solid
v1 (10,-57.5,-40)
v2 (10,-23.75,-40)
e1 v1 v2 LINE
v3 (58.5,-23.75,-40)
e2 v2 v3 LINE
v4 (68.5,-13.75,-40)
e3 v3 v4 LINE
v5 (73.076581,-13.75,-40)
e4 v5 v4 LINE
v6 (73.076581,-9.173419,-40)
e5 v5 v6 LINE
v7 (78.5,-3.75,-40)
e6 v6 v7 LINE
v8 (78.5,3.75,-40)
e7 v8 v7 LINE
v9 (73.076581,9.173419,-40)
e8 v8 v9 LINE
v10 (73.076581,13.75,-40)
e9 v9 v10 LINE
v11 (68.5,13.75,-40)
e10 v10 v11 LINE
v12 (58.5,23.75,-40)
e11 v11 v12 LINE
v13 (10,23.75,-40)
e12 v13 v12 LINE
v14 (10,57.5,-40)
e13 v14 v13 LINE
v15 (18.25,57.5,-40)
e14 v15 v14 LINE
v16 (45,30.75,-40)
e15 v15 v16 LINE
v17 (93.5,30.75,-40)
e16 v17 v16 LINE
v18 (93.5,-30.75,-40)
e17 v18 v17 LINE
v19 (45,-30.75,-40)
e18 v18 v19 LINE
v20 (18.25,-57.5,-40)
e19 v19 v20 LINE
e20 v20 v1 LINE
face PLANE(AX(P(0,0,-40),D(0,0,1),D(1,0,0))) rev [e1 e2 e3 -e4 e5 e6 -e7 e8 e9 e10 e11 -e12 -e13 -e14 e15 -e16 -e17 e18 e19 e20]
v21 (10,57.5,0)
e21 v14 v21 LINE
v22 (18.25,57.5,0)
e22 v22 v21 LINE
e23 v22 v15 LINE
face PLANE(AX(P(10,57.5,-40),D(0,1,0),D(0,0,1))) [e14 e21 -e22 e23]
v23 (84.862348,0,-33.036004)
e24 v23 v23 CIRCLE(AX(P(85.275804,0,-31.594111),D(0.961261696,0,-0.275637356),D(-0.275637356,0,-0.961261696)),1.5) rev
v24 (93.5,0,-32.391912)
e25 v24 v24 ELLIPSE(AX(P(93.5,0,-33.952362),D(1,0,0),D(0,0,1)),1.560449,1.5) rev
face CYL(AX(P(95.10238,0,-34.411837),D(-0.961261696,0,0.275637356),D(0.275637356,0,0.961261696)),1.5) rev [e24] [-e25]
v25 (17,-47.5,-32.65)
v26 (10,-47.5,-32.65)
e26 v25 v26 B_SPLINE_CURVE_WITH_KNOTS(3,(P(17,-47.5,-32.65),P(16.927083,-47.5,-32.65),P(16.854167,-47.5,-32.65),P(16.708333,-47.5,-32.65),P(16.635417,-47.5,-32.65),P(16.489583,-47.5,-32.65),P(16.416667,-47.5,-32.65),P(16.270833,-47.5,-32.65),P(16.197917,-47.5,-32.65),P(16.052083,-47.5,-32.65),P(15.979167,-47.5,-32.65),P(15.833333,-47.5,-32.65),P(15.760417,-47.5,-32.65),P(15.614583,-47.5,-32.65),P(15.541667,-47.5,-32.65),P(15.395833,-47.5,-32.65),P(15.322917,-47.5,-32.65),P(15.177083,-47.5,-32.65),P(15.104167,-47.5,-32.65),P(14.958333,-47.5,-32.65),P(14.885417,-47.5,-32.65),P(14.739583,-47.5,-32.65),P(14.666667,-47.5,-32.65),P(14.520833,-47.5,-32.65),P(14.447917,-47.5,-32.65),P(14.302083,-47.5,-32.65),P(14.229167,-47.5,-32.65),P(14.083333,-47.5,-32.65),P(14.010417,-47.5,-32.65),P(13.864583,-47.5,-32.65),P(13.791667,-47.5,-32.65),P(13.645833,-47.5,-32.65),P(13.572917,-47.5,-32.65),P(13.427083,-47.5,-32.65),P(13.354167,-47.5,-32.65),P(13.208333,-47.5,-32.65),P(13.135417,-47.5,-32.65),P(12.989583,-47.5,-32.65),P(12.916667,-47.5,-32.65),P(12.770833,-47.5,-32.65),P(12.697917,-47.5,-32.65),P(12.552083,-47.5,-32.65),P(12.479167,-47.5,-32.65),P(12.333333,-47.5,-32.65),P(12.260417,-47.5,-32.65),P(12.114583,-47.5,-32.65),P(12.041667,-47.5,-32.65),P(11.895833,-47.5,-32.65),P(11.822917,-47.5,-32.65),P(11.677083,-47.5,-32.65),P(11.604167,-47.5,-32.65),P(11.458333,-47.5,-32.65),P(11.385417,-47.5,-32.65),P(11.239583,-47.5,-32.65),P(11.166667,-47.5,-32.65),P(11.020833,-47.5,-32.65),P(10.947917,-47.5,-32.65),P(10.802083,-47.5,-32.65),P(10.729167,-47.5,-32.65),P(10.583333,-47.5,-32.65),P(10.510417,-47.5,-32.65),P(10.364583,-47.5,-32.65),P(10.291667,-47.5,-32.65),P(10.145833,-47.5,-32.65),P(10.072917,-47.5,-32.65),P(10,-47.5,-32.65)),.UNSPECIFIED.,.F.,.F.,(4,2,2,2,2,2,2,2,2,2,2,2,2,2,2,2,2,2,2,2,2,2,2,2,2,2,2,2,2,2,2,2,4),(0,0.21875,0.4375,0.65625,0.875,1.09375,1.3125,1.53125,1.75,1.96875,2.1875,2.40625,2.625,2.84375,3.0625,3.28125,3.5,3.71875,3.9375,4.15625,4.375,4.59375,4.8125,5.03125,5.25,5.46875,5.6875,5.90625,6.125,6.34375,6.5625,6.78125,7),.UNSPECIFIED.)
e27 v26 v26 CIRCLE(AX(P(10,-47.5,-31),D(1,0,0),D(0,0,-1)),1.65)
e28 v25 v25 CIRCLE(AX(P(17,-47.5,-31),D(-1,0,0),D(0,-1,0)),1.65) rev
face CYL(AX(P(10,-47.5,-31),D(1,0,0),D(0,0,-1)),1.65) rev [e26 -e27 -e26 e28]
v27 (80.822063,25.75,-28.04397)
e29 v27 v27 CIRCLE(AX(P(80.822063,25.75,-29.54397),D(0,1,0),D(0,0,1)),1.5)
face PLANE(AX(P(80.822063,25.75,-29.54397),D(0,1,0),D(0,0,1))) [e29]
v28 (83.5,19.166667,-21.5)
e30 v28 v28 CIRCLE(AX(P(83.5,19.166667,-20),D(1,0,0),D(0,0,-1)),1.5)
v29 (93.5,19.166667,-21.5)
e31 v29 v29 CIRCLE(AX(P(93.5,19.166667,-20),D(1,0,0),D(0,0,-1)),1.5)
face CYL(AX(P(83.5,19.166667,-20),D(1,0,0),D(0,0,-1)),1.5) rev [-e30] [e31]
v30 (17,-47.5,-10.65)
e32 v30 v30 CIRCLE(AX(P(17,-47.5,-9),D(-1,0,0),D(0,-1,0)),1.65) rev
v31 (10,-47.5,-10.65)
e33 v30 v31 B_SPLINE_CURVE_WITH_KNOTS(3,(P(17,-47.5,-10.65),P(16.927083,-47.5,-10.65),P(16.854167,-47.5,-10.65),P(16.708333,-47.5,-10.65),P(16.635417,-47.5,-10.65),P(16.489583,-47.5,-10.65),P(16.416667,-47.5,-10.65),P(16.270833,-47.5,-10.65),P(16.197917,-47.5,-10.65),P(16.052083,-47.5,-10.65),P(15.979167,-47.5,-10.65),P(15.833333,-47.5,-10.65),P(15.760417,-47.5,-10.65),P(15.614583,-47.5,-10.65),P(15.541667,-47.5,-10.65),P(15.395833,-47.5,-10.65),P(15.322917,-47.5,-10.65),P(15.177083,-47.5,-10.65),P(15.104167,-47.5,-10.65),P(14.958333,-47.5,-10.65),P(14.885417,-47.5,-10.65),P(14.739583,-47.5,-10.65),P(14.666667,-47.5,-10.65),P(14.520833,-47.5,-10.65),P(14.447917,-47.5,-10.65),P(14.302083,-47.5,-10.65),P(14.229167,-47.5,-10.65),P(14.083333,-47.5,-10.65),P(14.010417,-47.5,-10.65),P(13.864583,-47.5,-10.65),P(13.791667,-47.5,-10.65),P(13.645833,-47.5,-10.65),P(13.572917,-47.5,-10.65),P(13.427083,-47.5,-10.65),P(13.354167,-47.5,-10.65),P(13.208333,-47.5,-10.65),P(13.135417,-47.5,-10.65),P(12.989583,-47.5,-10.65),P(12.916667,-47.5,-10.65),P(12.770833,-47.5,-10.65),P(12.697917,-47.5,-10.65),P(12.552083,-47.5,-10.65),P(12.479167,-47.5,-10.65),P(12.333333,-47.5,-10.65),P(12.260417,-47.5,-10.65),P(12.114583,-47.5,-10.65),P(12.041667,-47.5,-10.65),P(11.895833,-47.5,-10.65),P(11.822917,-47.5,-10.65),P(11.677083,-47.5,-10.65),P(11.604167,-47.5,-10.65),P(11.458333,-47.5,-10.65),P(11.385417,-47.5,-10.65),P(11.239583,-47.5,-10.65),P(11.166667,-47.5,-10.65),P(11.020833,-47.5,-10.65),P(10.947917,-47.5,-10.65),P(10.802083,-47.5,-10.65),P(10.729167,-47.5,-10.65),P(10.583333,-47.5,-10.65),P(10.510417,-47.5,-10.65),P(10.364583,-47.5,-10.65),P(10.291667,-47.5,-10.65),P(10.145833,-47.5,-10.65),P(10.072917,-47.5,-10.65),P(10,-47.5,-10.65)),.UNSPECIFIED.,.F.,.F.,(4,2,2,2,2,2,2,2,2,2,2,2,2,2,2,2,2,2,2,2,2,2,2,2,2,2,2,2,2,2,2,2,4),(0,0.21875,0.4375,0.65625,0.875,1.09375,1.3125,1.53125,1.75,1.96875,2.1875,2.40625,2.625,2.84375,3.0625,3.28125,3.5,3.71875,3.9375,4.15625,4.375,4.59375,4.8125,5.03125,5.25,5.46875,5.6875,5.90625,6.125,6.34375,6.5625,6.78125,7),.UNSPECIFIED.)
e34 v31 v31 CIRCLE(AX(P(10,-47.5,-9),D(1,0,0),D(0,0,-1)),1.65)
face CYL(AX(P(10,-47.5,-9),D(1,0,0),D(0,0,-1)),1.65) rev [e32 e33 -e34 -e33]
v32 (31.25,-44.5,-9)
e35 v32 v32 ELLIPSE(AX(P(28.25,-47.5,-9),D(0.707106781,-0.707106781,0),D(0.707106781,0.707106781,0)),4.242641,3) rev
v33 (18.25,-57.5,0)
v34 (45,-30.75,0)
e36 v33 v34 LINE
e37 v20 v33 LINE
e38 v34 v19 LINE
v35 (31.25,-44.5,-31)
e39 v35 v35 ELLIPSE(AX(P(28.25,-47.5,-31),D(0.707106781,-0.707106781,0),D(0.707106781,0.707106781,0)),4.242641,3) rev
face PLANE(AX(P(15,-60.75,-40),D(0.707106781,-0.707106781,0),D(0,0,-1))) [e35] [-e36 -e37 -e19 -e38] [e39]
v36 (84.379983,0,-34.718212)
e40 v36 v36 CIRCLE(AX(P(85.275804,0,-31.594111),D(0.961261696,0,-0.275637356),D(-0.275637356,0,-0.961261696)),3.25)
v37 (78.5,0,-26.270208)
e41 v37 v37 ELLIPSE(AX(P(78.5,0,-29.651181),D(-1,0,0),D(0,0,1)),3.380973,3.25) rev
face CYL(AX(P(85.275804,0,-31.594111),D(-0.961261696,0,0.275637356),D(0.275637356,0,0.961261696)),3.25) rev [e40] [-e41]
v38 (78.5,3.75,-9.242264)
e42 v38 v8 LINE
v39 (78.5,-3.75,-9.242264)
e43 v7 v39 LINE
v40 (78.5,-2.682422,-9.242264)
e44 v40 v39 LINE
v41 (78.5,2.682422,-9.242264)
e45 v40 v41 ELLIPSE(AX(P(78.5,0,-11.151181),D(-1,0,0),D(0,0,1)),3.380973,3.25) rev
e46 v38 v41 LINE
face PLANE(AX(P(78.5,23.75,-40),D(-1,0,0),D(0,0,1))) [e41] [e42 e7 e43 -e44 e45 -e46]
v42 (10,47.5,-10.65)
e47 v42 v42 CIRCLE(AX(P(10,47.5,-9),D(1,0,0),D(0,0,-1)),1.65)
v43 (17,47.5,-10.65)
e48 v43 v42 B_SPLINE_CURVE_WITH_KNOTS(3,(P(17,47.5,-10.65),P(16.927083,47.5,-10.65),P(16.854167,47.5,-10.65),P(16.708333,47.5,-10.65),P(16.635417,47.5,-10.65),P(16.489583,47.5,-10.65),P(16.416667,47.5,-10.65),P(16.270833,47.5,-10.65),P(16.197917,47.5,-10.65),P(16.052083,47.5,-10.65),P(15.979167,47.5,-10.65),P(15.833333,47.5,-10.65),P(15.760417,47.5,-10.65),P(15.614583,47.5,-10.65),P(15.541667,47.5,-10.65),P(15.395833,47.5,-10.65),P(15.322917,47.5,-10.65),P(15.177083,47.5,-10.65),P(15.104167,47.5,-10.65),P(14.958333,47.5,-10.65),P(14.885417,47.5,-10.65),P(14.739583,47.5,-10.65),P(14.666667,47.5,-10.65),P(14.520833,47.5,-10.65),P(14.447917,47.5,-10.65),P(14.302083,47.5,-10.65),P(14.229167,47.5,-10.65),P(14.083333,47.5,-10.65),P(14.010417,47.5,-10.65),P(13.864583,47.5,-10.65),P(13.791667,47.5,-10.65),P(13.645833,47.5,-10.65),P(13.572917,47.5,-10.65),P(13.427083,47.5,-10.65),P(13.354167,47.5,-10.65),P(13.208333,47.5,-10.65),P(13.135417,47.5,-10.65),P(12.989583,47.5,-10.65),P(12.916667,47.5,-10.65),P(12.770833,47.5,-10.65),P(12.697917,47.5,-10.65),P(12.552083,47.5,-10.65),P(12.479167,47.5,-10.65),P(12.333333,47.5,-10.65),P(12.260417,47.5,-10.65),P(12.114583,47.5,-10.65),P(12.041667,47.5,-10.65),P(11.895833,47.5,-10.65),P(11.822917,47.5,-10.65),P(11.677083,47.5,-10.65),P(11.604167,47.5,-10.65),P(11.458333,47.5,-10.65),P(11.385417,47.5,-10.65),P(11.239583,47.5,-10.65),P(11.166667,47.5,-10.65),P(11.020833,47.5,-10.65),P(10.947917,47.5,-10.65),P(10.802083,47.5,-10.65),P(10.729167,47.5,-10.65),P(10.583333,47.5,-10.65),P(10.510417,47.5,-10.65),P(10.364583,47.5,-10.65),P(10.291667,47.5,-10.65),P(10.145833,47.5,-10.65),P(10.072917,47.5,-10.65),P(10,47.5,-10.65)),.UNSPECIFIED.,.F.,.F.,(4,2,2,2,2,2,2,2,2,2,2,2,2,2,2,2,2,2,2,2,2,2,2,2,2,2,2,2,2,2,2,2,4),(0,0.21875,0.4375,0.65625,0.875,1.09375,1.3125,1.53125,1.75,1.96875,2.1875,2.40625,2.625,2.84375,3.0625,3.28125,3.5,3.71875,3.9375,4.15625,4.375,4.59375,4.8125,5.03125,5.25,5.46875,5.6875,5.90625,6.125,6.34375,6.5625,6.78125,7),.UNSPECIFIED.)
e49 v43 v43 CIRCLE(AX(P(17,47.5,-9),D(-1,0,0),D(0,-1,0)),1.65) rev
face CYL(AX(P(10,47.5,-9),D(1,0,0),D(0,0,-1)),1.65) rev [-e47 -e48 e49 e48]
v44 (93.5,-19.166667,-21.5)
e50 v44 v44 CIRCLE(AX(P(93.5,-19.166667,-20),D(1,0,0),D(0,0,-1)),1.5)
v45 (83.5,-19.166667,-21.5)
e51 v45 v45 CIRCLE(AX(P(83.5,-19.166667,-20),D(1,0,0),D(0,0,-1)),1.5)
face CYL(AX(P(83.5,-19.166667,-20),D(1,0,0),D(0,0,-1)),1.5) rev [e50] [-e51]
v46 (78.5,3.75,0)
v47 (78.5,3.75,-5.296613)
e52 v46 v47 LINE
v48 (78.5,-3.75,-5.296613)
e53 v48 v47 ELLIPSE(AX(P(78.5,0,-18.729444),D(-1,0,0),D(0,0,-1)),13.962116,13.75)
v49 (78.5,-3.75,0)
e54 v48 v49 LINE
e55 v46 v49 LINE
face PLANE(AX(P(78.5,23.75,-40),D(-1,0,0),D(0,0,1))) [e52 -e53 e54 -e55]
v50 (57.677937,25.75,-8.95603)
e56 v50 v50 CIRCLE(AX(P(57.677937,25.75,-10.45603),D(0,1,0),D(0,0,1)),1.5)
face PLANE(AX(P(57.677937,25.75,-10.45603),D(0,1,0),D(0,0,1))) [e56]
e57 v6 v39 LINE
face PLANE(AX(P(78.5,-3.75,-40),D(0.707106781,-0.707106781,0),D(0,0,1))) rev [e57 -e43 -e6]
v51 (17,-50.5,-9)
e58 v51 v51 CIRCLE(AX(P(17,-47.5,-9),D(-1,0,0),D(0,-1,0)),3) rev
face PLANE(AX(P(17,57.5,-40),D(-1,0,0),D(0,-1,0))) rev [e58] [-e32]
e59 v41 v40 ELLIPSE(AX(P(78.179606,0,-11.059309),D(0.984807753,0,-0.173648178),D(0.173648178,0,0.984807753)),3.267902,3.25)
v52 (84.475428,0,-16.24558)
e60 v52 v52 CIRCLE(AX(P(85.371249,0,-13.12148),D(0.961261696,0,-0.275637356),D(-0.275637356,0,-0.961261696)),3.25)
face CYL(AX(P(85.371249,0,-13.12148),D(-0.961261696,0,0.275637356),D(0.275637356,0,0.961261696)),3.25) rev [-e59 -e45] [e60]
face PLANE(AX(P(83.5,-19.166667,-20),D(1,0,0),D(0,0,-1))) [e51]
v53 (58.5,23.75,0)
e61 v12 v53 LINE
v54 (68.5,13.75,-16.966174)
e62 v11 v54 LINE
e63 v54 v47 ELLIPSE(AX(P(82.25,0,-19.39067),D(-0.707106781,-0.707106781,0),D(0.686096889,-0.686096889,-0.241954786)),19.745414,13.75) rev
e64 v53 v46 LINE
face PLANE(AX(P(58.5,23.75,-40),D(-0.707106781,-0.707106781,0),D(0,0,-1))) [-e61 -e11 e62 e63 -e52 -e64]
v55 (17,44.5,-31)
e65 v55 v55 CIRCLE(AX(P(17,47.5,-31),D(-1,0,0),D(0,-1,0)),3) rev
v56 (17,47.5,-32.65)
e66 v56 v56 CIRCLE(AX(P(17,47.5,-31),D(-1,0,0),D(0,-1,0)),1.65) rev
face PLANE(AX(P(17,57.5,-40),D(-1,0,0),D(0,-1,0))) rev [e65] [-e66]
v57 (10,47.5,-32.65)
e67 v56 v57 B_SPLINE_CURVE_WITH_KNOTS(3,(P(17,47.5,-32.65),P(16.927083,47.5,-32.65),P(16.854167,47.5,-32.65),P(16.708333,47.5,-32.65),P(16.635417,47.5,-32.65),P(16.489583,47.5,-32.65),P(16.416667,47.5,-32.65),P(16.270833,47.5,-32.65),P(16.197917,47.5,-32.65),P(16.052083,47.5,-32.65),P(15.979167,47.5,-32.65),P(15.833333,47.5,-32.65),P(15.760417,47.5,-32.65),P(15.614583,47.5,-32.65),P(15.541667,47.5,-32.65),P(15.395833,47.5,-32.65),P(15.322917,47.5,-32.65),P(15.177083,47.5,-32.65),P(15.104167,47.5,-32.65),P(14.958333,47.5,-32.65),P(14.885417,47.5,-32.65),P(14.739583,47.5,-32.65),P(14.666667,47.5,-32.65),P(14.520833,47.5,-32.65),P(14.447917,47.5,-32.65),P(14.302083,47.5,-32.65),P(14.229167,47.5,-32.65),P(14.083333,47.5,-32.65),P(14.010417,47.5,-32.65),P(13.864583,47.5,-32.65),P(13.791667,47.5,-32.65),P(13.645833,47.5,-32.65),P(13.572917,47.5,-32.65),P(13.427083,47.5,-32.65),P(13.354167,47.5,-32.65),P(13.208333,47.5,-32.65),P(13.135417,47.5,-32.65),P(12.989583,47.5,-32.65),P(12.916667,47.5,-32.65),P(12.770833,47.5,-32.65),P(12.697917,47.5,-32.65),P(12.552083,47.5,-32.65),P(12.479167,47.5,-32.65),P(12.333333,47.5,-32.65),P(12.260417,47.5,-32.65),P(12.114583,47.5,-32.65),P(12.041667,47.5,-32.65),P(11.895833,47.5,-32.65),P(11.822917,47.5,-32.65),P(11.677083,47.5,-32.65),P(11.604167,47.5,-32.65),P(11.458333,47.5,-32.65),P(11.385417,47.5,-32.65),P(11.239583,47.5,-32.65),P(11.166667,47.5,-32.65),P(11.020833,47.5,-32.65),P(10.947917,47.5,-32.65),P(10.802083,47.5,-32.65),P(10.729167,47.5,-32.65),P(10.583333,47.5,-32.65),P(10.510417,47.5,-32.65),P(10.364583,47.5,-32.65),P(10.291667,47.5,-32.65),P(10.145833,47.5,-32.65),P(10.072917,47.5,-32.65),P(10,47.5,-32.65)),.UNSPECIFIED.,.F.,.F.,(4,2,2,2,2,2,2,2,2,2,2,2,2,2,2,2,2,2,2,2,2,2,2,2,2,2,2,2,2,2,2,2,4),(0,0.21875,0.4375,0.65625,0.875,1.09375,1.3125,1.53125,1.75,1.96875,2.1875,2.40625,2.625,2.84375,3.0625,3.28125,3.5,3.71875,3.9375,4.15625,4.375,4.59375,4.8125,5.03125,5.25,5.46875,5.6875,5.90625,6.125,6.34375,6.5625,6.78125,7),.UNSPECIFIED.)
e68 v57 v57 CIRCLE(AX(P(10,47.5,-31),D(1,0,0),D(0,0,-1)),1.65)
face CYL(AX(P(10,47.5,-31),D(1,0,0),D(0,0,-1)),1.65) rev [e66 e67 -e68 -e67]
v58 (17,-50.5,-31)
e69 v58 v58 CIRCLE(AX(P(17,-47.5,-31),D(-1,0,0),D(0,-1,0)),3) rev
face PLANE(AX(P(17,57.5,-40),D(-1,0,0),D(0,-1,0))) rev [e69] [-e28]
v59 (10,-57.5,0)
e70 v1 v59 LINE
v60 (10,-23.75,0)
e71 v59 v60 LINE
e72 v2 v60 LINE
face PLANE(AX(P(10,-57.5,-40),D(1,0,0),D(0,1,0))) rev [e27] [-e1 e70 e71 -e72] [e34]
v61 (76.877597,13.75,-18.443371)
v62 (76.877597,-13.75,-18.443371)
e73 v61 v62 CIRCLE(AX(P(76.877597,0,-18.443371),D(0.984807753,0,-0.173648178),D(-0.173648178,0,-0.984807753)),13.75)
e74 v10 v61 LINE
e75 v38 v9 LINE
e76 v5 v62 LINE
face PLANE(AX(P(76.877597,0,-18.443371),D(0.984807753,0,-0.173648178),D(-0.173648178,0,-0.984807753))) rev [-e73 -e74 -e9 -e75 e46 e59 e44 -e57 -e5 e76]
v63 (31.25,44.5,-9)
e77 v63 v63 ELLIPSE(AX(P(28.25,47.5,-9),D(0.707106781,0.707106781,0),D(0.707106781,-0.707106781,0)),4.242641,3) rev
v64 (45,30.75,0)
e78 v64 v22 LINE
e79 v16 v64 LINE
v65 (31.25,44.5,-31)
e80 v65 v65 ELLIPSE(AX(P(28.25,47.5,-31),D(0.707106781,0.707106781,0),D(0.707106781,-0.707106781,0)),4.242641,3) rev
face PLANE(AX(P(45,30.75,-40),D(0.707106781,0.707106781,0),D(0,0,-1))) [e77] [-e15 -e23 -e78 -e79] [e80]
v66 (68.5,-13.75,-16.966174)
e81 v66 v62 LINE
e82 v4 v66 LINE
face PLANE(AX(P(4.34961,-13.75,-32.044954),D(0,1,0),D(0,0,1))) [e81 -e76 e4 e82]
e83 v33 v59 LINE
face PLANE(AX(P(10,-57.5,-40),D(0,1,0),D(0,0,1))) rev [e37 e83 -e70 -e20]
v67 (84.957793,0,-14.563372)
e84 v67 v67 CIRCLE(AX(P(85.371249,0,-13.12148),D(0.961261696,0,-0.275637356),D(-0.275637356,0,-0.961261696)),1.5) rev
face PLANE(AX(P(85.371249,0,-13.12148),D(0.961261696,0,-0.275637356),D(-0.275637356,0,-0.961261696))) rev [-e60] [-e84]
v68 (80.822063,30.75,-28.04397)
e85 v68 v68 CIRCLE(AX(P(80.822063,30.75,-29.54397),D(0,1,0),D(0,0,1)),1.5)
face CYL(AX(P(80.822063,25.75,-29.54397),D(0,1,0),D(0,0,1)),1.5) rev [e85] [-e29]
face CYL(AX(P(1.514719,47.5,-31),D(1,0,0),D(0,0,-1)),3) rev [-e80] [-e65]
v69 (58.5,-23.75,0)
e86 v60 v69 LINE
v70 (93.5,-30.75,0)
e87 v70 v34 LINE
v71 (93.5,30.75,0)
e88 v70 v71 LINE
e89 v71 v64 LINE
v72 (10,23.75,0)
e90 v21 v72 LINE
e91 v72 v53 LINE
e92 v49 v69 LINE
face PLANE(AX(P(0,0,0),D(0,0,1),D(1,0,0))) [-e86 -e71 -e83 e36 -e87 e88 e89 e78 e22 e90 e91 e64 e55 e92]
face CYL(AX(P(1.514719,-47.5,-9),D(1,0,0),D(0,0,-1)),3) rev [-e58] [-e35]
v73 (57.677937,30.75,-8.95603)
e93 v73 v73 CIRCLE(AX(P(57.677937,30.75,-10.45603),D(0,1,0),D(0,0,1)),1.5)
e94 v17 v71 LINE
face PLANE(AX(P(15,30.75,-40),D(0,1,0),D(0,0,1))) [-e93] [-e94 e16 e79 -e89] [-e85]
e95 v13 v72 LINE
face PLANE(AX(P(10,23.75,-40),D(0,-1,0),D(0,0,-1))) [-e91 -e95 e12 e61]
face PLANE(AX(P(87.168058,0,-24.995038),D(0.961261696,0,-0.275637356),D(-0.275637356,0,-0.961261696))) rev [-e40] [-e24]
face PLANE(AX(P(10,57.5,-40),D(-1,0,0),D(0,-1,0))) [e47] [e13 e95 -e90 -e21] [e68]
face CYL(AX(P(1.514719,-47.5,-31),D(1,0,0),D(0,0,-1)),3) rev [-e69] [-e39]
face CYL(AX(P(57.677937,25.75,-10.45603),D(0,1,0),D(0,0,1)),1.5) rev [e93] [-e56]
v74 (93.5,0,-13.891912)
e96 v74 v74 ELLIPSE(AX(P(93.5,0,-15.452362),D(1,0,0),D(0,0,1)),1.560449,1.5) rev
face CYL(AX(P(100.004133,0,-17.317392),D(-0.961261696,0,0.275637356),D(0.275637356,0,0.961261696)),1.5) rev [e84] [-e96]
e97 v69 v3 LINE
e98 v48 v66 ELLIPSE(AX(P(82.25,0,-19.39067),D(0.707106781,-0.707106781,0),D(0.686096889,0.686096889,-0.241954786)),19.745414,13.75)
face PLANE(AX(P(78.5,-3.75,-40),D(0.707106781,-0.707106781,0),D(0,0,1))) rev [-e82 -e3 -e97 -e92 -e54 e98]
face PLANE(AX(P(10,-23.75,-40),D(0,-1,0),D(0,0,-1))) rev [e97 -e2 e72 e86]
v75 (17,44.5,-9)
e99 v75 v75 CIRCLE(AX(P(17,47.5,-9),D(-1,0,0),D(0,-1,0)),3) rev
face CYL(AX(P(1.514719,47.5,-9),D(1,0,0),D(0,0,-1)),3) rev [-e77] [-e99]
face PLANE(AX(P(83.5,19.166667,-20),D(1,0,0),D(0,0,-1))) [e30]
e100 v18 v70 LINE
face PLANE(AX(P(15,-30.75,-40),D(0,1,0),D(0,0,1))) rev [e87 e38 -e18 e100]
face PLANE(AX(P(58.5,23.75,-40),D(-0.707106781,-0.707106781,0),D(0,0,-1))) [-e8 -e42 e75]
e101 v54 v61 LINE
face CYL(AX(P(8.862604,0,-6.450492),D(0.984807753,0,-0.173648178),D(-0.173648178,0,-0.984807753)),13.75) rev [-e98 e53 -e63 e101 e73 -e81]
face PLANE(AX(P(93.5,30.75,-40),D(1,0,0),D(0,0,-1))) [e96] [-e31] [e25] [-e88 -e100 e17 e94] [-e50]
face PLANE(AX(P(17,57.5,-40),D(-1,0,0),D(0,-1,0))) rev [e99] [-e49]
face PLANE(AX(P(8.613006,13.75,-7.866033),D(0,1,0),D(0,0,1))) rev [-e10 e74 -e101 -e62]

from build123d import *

# Parameters (mm, degrees)
BOSS_EXTRUDE1_DEPTH = 40
CHAMFER1_SIZE       = 20
CHAMFER2_SIZE       = 30
SKETCH2_R           = 3.25
CUT_EXTRUDE1_DEPTH  = 32
CUT_EXTRUDE5_START  = 5
SKETCH2_3_R         = 3.25
CUT_EXTRUDE5_DEPTH  = 32
SKETCH5_R           = 1.65
CUT_EXTRUDE2_DEPTH  = 109.988531507
SKETCH6_R           = 3
CUT_EXTRUDE3_DEPTH  = 76.5
SKETCH7_R           = 1.5
CUT_EXTRUDE4_DEPTH  = 10
SKETCH8_R           = 1.5
CUT_EXTRUDE6_DEPTH  = 76.478231012
CUT_EXTRUDE7_DEPTH  = 93.643917135
SKETCH10_R          = 1.5
CUT_EXTRUDE8_DEPTH  = 5


with BuildPart() as part:
    # Sketch1 → Boss-Extrude1 (new body)
    with BuildSketch(Plane.XY):
        Polygon((10, 57.5), (15, 57.5), (15, 30.75), (93.5, 30.75), (93.5, 0), (78.5, 0), (78.5, 23.75), (10, 23.75), align=None)
    boss_extrude1 = extrude(amount=-BOSS_EXTRUDE1_DEPTH)

    # Mirror1: Boss-Extrude1 across plane
    add(boss_extrude1.mirror(Plane(origin=(78.5, 0, -40), x_dir=(0, 0, 1), z_dir=(0, -1, 0))))

    # Chamfer1
    chamfer1_edges = [part.edges().sort_by_distance(p)[0] for p in [
        (78.5, 23.75, -20),
        (78.5, -23.75, -20),
    ]]
    chamfer(chamfer1_edges, length=CHAMFER1_SIZE)

    # Chamfer2
    # the kernel refuses this chamfer: 30 mm, written as the material it adds along each edge
    with BuildSketch(Plane(origin=(15, 30.75, 0), x_dir=(0.9996219169112968, -0.02749587661058632, 0), z_dir=(0, 0, -1))) as chamfer2_piece_1_section:
        Polygon((CHAMFER2_SIZE * 0.999621916911, -CHAMFER2_SIZE * 0.0274958766106), (-CHAMFER2_SIZE * 0.0274958766106, -CHAMFER2_SIZE * 0.999621916911), (0, 0), align=None)
    chamfer2_piece_1 = extrude(amount=40, mode=Mode.PRIVATE)
    chamfer2_piece_1 = split(chamfer2_piece_1, bisect_by=Plane(origin=(25.097042378, 57.5, -20), z_dir=(0, -1, 0)), keep=Keep.TOP, mode=Mode.PRIVATE)
    add(chamfer2_piece_1)
    with BuildSketch(Plane(origin=(15, -30.75, 0), x_dir=(-0.02749587661058655, -0.9996219169112968, 0), z_dir=(0, 0, -1))) as chamfer2_piece_2_section:
        Polygon((CHAMFER2_SIZE * 0.999621916911, -CHAMFER2_SIZE * 0.0274958766106), (-CHAMFER2_SIZE * 0.0274958766106, -CHAMFER2_SIZE * 0.999621916911), (0, 0), align=None)
    chamfer2_piece_2 = extrude(amount=40, mode=Mode.PRIVATE)
    chamfer2_piece_2 = split(chamfer2_piece_2, bisect_by=Plane(origin=(25.097042378, -57.5, -20), z_dir=(0, 1, 0)), keep=Keep.TOP, mode=Mode.PRIVATE)
    add(chamfer2_piece_2)

    # Sketch2 → Cut-Extrude1 (cut)
    with BuildSketch(Plane(origin=(51.601375419, 0, -14.7964563), x_dir=(0, -1, 0), z_dir=(0.9612616959383188, 0, -0.27563735581699983))):
        with Locations(Location((0, -10.918329477, 0), (0, 0, 270))):
            Circle(SKETCH2_R)
    extrude(amount=CUT_EXTRUDE1_DEPTH, mode=Mode.SUBTRACT)

    # Sketch2<3> → Cut-Extrude5 (cut)
    with BuildSketch(Plane(origin=(51.601375419, 0, -14.7964563), x_dir=(0, -1, 0), z_dir=(0.9612616959383188, 0, -0.27563735581699983)).offset(CUT_EXTRUDE5_START)):
        with Locations(Location((0, 6.865011898, 0), (0, 0, 270))):
            Circle(SKETCH2_3_R)
    extrude(amount=CUT_EXTRUDE5_DEPTH, mode=Mode.SUBTRACT)

    # Sketch5 → Cut-Extrude2 (cut, through all)
    with BuildSketch(Plane(origin=(93.5, 0, 0), x_dir=(0, 0, -1), z_dir=(1, 0, 0))):
        with Locations((31, -47.5)):
            Circle(SKETCH5_R)
        with Locations((9, -47.5)):
            Circle(SKETCH5_R)
        with Locations((9, 47.5)):
            Circle(SKETCH5_R)
        with Locations((31, 47.5)):
            Circle(SKETCH5_R)
    extrude(amount=-CUT_EXTRUDE2_DEPTH, mode=Mode.SUBTRACT)

    # Sketch6 → Cut-Extrude3 (cut)
    with BuildSketch(Plane(origin=(93.5, 0, 0), x_dir=(0, 0, -1), z_dir=(1, 0, 0))):
        with Locations(Location((31, -47.5, 0), (0, 0, 90))):
            Circle(SKETCH6_R)
        with Locations(Location((9, -47.5, 0), (0, 0, 90))):
            Circle(SKETCH6_R)
        with Locations(Location((31, 47.5, 0), (0, 0, 270))):
            Circle(SKETCH6_R)
        with Locations(Location((9, 47.5, 0), (0, 0, 270))):
            Circle(SKETCH6_R)
    extrude(amount=-CUT_EXTRUDE3_DEPTH, mode=Mode.SUBTRACT)

    # Sketch7 → Cut-Extrude4 (cut)
    with BuildSketch(Plane(origin=(93.5, 0, 0), x_dir=(0, 0, -1), z_dir=(1, 0, 0))):
        with Locations((20, -19.166666667)):
            Circle(SKETCH7_R)
        with Locations((20, 19.166666667)):
            Circle(SKETCH7_R)
    extrude(amount=-CUT_EXTRUDE4_DEPTH, mode=Mode.SUBTRACT)

    # Sketch8 → Cut-Extrude6 (cut, through all)
    with BuildSketch(Plane(origin=(51.601375419, 0, -14.7964563), x_dir=(0, -1, 0), z_dir=(0.9612616959383188, 0, -0.27563735581699983))):
        with Locations(Location((0, -10.918329477, 0), (0, 0, 270))):
            Circle(SKETCH8_R)
        with Locations(Location((0, 6.865011898, 0), (0, 0, 270))):
            Circle(SKETCH8_R)
    extrude(amount=CUT_EXTRUDE6_DEPTH, mode=Mode.SUBTRACT)

    # Sketch9 → Cut-Extrude7 (cut, through all)
    with BuildSketch(Plane(origin=(77.713455589, 0, -13.702978984), x_dir=(-0.17364817766693075, 0, -0.9848077530122081), z_dir=(0.9848077530122081, 0, -0.17364817766693075))):
        with BuildLine():
            Line((4.81351977, -13.75), (14.81351977, -13.75))
            Line((14.81351977, -13.75), (30.80281724, -13.75))
            Line((30.80281724, -13.75), (30.80281724, 13.75))
            Line((30.80281724, 13.75), (6.250897221, 13.75))
            Line((6.250897221, 13.75), (4.81351977, 13.75))
            ThreePointArc((4.81351977, 13.75), (-8.93648023, 0), (4.81351977, -13.75))
        make_face()
    extrude(amount=-CUT_EXTRUDE7_DEPTH, mode=Mode.SUBTRACT)

    # Sketch10 → Cut-Extrude8 (cut)
    with BuildSketch(Plane(origin=(0, 30.75, 0), x_dir=(1, 0, 0), z_dir=(0, 1, 0))):
        with Locations(Location((80.822063113, 29.543969578, 0), (0, 0, 270))):
            Circle(SKETCH10_R)
        with Locations(Location((57.677936887, 10.456030422, 0), (0, 0, 270))):
            Circle(SKETCH10_R)
    extrude(amount=-CUT_EXTRUDE8_DEPTH, mode=Mode.SUBTRACT)


solid = part.part
